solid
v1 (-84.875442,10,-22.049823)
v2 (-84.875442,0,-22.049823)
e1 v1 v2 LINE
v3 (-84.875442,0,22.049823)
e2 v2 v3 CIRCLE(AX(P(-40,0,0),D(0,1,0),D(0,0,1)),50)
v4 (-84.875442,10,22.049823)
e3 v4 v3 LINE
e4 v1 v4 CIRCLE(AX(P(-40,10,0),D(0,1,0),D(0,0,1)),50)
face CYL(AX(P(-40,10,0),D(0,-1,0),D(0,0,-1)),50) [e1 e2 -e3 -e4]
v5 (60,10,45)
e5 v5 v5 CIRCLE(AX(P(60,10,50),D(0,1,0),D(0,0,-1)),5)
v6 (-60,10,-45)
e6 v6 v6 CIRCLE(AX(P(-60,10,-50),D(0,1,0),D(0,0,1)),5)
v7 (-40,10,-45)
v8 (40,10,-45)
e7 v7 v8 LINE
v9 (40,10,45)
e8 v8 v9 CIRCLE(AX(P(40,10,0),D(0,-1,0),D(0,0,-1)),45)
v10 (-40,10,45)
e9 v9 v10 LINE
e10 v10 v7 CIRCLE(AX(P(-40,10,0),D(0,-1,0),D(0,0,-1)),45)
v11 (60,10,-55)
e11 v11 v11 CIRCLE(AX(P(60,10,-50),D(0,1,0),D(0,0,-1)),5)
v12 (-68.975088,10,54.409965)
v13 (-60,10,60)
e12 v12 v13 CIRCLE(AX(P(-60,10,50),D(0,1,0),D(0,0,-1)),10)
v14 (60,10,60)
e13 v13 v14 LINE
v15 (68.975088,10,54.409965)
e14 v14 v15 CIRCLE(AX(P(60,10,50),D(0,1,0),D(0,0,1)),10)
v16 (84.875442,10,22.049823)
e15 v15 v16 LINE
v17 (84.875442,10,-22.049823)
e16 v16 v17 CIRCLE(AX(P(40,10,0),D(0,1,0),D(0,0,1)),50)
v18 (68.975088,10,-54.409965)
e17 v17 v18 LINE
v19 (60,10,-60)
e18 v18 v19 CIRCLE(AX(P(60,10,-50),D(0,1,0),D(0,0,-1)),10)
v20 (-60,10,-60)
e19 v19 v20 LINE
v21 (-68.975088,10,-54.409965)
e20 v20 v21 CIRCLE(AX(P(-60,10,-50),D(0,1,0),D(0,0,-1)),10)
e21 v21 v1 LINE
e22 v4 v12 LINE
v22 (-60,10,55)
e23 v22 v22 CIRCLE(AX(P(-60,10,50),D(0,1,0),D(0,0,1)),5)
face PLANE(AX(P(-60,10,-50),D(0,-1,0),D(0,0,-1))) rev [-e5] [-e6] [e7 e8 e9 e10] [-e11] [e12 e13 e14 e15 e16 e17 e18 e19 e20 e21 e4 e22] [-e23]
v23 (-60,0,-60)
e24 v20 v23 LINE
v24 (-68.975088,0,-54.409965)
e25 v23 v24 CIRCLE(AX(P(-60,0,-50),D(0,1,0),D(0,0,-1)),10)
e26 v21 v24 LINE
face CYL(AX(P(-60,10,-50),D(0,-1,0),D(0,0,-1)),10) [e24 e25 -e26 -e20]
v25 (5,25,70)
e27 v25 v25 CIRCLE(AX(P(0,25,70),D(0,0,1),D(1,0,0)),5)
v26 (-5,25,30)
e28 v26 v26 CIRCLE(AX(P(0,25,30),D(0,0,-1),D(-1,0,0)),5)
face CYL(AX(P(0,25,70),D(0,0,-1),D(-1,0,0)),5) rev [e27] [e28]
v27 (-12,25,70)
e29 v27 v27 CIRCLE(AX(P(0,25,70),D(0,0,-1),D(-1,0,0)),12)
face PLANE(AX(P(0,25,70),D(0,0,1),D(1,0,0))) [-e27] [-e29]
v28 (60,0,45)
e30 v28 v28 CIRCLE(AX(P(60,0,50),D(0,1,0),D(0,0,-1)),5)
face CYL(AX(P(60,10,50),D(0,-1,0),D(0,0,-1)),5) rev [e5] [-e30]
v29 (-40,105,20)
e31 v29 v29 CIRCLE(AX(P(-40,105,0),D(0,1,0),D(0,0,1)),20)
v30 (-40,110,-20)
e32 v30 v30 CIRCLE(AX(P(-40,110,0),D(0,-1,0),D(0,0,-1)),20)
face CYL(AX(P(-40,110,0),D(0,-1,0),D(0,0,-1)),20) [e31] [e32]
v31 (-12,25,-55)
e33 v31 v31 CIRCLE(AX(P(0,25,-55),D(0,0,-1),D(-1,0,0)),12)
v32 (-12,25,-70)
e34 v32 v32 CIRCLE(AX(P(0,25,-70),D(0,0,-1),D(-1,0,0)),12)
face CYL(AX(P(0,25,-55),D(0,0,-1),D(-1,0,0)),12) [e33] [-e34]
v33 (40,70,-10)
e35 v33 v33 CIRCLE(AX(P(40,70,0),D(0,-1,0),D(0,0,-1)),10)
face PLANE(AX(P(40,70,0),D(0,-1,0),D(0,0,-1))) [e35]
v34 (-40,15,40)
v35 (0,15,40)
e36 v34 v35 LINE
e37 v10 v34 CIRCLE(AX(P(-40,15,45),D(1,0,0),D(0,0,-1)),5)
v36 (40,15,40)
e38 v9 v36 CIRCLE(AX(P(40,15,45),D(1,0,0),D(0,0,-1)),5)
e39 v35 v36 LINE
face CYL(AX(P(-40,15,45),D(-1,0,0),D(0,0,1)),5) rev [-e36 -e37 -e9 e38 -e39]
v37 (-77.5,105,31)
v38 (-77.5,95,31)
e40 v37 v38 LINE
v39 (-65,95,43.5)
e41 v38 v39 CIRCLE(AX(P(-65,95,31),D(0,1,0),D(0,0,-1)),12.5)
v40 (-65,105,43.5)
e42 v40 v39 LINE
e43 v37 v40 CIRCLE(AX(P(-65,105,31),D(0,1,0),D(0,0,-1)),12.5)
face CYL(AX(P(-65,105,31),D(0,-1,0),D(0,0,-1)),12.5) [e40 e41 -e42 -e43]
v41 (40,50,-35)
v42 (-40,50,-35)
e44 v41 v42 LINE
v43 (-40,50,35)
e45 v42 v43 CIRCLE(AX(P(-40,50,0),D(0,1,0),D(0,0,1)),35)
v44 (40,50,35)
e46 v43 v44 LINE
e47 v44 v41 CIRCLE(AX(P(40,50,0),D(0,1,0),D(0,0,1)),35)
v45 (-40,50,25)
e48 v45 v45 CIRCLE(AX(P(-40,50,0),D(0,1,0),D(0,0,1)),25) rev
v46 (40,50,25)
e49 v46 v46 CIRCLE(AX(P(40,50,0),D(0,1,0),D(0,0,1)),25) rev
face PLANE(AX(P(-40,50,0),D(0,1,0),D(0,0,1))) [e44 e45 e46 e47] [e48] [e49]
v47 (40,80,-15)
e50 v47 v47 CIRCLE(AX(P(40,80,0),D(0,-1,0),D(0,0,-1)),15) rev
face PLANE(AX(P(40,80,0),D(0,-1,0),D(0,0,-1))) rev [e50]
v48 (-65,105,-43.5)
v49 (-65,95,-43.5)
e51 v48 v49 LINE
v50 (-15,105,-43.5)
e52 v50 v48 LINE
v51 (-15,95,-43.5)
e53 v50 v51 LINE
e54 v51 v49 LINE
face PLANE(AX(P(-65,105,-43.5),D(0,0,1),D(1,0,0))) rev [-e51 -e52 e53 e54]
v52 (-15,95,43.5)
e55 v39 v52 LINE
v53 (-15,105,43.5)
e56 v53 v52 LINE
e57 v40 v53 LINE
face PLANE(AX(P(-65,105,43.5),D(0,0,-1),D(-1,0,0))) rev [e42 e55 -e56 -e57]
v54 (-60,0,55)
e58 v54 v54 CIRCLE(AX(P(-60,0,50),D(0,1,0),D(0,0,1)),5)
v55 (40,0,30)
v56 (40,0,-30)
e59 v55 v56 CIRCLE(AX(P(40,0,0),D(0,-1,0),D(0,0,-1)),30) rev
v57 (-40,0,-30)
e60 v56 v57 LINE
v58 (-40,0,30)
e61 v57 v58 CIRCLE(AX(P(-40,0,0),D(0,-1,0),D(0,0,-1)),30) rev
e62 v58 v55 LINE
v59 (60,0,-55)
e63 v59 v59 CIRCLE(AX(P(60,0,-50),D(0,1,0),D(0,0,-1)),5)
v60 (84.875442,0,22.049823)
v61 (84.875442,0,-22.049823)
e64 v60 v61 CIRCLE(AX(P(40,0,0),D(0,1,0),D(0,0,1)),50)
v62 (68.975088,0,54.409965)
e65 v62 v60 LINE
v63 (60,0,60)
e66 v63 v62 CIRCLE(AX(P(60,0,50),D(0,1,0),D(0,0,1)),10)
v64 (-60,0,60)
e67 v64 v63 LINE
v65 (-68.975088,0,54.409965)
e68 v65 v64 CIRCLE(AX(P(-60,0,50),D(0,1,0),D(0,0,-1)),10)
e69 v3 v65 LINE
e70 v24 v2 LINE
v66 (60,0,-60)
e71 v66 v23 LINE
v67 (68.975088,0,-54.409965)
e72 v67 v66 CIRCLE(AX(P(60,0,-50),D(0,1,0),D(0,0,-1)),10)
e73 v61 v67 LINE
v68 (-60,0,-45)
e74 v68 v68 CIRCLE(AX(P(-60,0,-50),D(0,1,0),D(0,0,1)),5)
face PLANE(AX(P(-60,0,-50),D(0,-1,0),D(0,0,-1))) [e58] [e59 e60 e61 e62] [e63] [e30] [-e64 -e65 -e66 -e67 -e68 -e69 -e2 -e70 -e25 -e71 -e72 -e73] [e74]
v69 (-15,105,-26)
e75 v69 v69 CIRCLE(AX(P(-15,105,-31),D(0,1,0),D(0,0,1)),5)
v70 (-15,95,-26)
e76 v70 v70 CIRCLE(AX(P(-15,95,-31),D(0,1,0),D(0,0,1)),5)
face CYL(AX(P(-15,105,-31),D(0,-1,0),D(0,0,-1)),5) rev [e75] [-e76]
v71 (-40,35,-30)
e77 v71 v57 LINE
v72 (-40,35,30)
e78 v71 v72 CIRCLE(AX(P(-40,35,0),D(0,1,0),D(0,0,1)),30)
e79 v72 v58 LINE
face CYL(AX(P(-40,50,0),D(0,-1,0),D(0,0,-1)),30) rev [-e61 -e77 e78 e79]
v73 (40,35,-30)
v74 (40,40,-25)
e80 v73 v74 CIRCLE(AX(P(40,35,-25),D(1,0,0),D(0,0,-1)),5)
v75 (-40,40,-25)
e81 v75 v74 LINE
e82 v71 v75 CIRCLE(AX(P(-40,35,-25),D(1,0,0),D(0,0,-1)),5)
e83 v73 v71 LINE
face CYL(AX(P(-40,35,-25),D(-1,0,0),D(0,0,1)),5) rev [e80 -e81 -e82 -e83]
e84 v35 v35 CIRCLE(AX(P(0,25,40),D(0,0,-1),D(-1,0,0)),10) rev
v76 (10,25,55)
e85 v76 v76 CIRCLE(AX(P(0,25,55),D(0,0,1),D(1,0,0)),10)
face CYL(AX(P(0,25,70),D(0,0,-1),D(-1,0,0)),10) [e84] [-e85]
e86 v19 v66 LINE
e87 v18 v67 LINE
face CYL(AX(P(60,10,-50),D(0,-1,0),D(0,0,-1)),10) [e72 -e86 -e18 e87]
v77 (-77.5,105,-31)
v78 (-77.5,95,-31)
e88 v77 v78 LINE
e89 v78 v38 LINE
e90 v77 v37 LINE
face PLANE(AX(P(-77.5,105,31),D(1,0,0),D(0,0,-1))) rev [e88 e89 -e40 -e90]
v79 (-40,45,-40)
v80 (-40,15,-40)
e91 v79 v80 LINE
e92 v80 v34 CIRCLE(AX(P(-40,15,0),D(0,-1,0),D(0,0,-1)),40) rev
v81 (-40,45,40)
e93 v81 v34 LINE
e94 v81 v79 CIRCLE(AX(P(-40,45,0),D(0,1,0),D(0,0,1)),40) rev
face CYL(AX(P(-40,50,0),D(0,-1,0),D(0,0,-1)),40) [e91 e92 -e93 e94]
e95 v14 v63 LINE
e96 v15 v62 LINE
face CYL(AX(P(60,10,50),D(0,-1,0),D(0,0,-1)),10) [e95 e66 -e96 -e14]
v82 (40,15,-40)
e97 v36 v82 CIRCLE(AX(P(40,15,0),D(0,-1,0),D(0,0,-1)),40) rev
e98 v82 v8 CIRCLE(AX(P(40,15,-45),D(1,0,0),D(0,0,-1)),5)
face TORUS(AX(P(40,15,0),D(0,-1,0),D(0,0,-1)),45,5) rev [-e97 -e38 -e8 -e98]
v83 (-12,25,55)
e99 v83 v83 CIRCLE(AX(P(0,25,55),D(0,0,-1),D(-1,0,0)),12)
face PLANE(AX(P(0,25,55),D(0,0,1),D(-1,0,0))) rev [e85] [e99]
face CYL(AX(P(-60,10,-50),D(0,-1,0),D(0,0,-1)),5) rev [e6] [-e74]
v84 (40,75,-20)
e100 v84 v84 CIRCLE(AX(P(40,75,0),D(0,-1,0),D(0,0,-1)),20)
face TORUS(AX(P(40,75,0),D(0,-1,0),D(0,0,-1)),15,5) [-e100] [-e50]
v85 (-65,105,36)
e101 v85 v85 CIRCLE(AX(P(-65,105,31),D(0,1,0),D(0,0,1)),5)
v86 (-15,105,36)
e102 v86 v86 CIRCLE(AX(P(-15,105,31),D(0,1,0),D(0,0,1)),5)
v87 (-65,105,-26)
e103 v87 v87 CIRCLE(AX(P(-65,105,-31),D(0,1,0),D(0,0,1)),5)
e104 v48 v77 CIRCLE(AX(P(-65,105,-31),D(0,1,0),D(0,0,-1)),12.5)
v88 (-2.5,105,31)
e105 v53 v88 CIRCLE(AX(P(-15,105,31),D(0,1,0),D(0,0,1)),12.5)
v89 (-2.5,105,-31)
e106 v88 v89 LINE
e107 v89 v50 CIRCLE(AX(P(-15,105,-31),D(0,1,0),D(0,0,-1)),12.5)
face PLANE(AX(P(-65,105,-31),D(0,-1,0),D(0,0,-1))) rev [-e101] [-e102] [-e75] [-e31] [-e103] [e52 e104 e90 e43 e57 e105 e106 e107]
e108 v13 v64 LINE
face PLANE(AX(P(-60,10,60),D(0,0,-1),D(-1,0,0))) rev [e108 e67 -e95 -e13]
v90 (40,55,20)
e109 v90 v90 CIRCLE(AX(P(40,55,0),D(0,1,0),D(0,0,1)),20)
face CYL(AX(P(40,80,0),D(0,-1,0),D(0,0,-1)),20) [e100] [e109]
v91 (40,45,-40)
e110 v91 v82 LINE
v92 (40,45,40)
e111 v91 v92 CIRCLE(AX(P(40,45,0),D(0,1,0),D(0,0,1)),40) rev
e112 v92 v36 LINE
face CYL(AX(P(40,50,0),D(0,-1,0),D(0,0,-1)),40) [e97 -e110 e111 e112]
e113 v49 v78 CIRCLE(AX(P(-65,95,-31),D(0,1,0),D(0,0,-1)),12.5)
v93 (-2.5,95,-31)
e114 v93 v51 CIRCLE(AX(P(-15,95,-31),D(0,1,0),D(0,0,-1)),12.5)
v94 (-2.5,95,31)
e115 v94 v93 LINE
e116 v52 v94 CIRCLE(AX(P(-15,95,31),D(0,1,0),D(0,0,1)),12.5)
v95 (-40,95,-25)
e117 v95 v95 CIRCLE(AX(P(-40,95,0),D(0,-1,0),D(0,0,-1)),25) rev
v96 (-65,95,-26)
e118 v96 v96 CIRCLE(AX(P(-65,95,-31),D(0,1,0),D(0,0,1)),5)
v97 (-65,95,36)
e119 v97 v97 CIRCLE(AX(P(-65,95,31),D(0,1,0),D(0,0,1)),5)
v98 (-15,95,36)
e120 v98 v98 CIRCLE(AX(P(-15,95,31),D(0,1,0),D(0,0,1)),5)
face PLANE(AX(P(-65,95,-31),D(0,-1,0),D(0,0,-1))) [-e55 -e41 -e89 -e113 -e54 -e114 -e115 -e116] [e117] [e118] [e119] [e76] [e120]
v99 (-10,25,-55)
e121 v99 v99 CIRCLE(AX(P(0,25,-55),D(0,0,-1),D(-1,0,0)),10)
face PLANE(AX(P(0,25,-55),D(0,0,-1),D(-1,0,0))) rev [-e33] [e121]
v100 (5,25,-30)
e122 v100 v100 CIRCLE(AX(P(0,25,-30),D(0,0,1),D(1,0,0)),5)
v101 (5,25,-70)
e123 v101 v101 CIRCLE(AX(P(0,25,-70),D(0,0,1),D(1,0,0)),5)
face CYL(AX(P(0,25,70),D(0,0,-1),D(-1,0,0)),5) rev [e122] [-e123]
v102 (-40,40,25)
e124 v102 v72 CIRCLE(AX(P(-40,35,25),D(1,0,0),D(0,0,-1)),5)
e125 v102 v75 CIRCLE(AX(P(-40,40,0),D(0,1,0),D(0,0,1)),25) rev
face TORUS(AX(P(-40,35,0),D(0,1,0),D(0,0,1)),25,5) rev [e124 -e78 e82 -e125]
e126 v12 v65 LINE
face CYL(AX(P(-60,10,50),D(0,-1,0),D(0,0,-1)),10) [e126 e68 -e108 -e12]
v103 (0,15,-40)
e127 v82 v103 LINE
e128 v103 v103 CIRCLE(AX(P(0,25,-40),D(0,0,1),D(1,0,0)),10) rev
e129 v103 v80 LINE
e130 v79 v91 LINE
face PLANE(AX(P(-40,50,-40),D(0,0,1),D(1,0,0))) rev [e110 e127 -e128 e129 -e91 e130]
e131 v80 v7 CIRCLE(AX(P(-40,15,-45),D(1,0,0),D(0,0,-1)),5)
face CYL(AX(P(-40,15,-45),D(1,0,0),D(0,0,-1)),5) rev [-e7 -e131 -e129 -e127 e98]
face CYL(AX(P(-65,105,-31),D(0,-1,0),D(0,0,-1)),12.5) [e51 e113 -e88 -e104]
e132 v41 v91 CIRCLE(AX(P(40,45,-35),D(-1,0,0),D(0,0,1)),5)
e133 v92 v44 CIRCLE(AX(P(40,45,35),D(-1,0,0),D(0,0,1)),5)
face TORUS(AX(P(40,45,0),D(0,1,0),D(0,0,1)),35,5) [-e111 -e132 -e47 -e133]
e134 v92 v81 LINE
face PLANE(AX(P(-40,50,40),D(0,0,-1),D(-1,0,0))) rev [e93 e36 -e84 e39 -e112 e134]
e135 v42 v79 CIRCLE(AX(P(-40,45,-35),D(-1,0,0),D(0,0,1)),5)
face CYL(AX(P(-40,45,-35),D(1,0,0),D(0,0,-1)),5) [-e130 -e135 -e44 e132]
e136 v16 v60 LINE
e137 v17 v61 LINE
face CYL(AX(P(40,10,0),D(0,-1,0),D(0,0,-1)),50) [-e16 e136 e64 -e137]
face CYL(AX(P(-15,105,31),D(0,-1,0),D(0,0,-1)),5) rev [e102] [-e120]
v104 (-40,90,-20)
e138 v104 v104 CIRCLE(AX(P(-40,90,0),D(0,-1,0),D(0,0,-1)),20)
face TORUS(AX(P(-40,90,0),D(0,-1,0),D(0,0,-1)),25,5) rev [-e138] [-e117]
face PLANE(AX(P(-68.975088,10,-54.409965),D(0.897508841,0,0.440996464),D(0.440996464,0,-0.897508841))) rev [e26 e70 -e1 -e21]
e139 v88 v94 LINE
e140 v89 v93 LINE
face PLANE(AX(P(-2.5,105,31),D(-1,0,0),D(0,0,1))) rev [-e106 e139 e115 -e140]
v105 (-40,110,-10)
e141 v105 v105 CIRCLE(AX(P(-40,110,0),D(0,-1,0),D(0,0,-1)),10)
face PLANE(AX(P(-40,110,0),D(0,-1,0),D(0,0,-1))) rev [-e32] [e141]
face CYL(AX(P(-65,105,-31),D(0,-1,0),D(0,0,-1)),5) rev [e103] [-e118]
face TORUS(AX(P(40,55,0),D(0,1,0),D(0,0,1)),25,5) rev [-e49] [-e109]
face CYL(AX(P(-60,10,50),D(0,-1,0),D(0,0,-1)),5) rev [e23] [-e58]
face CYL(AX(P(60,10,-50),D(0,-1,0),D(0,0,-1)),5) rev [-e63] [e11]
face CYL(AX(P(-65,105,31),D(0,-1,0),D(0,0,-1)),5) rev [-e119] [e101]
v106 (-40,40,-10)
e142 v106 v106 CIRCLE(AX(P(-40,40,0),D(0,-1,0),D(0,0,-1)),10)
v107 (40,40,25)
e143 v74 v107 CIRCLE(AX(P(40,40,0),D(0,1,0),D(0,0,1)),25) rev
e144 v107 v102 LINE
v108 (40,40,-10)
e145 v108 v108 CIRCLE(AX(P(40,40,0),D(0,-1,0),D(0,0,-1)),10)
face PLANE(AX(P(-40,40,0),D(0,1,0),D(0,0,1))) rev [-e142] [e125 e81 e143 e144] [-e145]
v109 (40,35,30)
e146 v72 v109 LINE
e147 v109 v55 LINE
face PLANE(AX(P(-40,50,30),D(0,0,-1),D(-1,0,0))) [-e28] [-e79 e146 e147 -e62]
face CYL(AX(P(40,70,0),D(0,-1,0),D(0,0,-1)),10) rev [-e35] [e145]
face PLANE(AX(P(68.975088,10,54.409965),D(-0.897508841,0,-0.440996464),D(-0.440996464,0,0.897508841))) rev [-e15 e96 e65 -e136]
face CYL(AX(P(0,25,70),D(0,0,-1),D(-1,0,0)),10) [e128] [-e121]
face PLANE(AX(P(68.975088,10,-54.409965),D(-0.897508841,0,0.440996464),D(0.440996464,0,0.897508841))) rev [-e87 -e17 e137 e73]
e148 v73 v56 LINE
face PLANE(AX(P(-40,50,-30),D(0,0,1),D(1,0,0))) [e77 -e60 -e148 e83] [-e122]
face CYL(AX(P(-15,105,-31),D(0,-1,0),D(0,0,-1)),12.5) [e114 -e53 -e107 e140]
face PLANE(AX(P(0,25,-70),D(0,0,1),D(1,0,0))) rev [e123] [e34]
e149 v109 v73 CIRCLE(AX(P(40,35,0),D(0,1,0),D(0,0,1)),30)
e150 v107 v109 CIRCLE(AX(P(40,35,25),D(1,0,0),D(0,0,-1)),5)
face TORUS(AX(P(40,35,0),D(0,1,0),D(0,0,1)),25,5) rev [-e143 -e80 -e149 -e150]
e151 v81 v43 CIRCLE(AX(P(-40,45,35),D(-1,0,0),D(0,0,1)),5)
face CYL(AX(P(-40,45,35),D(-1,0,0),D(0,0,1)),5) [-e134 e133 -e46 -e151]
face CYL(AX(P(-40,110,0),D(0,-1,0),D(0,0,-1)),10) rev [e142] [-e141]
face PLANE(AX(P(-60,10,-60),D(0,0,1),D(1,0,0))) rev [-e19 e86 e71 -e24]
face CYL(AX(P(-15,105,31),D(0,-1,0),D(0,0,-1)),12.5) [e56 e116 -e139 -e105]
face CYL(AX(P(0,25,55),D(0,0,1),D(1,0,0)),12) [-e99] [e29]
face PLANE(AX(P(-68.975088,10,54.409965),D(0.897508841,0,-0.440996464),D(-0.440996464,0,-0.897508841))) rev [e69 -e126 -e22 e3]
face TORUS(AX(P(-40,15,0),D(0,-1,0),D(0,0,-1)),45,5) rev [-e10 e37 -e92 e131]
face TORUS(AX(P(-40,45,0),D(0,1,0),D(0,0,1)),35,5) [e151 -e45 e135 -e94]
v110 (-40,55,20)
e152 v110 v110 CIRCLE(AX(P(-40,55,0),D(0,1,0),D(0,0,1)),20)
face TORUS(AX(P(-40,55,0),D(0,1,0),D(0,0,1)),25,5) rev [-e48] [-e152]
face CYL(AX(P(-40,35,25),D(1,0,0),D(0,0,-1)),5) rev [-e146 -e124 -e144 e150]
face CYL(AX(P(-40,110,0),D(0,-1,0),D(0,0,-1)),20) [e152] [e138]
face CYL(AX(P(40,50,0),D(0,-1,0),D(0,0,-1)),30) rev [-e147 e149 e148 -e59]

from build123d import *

# Parameters (mm, degrees)
SKETCH1_R           = 5
BOSS_EXTRUDE1_DEPTH = 10
BOSS_EXTRUDE2_DEPTH = 40
SHELL2_DEPTH        = 40
BOSS_EXTRUDE3_START = -10
SKETCH3_R           = 20
BOSS_EXTRUDE3_DEPTH = 30
SKETCH4_R           = 10
CUT_EXTRUDE1_DEPTH  = 30
SKETCH5_R           = 20
SKETCH5_R_2         = 10
BOSS_EXTRUDE4_DEPTH = 70
SKETCH5_3_R         = 10
CUT_EXTRUDE3_DEPTH  = 10
BOSS_EXTRUDE6_START = -15
SKETCH7_R           = 20
SKETCH7_R_2         = 5
BOSS_EXTRUDE6_DEPTH = 10
SKETCH10_R          = 10
SKETCH10_R_2        = 5
BOSS_EXTRUDE7_DEPTH = 70
CUT_EXTRUDE4_DEPTH  = 40
SKETCH12_R          = 5
CUT_EXTRUDE5_DEPTH  = 142.5
BOSS_EXTRUDE8_START = -15
SKETCH13_R          = 12
SKETCH13_R_2        = 10
BOSS_EXTRUDE8_DEPTH = 15
FILLET1_R           = 5


# Read off the part's stored shape, not the designer's step: Shell2
with BuildPart() as part:
    # Sketch1 → Boss-Extrude1 (new body)
    with BuildSketch(Plane(origin=(0, 0, 0), x_dir=(1, 0, 0), z_dir=(0, 1, 0))):
        with BuildLine():
            Line((-60, -60), (60, -60))
            ThreePointArc((60, -60), (65.286792677, -58.488216726), (68.975088406, -54.409964638))
            Line((68.975088406, -54.409964638), (84.87544203, -22.049823188))
            ThreePointArc((84.87544203, -22.049823188), (90, 0), (84.87544203, 22.049823188))
            Line((84.87544203, 22.049823188), (68.975088406, 54.409964638))
            ThreePointArc((68.975088406, 54.409964638), (65.286792677, 58.488216726), (60, 60))
            Line((60, 60), (-60, 60))
            ThreePointArc((-60, 60), (-65.286792677, 58.488216726), (-68.975088406, 54.409964638))
            Line((-68.975088406, 54.409964638), (-84.87544203, 22.049823188))
            ThreePointArc((-84.87544203, 22.049823188), (-90, 0), (-84.87544203, -22.049823188))
            Line((-84.87544203, -22.049823188), (-68.975088406, -54.409964638))
            ThreePointArc((-68.975088406, -54.409964638), (-65.286792677, -58.488216726), (-60, -60))
        make_face()
        with Locations(Location((-60, 50, 0), (0, 0, 270))):
            Circle(SKETCH1_R, mode=Mode.SUBTRACT)
        with Locations(Location((-60, -50, 0), (0, 0, 270))):
            Circle(SKETCH1_R, mode=Mode.SUBTRACT)
        with Locations(Location((60, -50, 0), (0, 0, 90))):
            Circle(SKETCH1_R, mode=Mode.SUBTRACT)
        with Locations(Location((60, 50, 0), (0, 0, 90))):
            Circle(SKETCH1_R, mode=Mode.SUBTRACT)
    extrude(amount=BOSS_EXTRUDE1_DEPTH)

    # Sketch2 → Boss-Extrude2 (add)
    with BuildSketch(Plane(origin=(0, 10, 0), x_dir=(1, 0, 0), z_dir=(0, 1, 0))):
        with BuildLine():
            Line((-40, 40), (40, 40))
            ThreePointArc((40, 40), (80, 0), (40, -40))
            Line((40, -40), (-40, -40))
            ThreePointArc((-40, -40), (-80, 0), (-40, 40))
        make_face()
    extrude(amount=BOSS_EXTRUDE2_DEPTH)

    # Shell2 outline → Shell2 (cut)
    with BuildSketch(Plane(origin=(0, 0, 0), x_dir=(1, 0, 0), z_dir=(0, 1, 0))):
        with BuildLine():
            ThreePointArc((-40, 30), (-70, 0), (-40, -30))
            Line((-40, -30), (40, -30))
            ThreePointArc((40, -30), (70, 0), (40, 30))
            Line((40, 30), (-40, 30))
        make_face()
    extrude(amount=SHELL2_DEPTH, mode=Mode.SUBTRACT)

    # Sketch3 → Boss-Extrude3 (add)
    with BuildSketch(Plane.XZ.offset(-40).offset(BOSS_EXTRUDE3_START)):
        with Locations(Location((40, 0, 0), (0, 0, 270))):
            Circle(SKETCH3_R)
    extrude(amount=-BOSS_EXTRUDE3_DEPTH)

    # Sketch4 → Cut-Extrude1 (cut)
    with BuildSketch(Plane.XZ.offset(-40)):
        with Locations(Location((40, 0, 0), (0, 0, 270))):
            Circle(SKETCH4_R)
    extrude(amount=-CUT_EXTRUDE1_DEPTH, mode=Mode.SUBTRACT)

    # Sketch5 → Boss-Extrude4 (add)
    with BuildSketch(Plane.XZ.offset(-40)):
        with Locations(Location((-40, 0, 0), (0, 0, 270))):
            Circle(SKETCH5_R)
        with Locations(Location((-40, 0, 0), (0, 0, 270))):
            Circle(SKETCH5_R_2, mode=Mode.SUBTRACT)
    extrude(amount=-BOSS_EXTRUDE4_DEPTH)

    # Sketch5<3> → Cut-Extrude3 (cut)
    with BuildSketch(Plane.XZ.offset(-40)):
        with Locations(Location((-40, 0, 0), (0, 0, 270))):
            Circle(SKETCH5_3_R)
    extrude(amount=-CUT_EXTRUDE3_DEPTH, mode=Mode.SUBTRACT)

    # Sketch7 → Boss-Extrude6 (add)
    with BuildSketch(Plane(origin=(0, 110, 0), x_dir=(1, 0, 0), z_dir=(0, 1, 0)).offset(BOSS_EXTRUDE6_START)):
        with BuildLine():
            Line((-65, -43.5), (-15, -43.5))
            ThreePointArc((-15, -43.5), (-6.161165235, -39.838834765), (-2.5, -31))
            Line((-2.5, -31), (-2.5, 31))
            ThreePointArc((-2.5, 31), (-6.161165235, 39.838834765), (-15, 43.5))
            Line((-15, 43.5), (-65, 43.5))
            ThreePointArc((-65, 43.5), (-73.838834765, 39.838834765), (-77.5, 31))
            Line((-77.5, 31), (-77.5, -31))
            ThreePointArc((-77.5, -31), (-73.838834765, -39.838834765), (-65, -43.5))
        make_face()
        with Locations(Location((-40, 0, 0), (0, 0, 90))):
            Circle(SKETCH7_R, mode=Mode.SUBTRACT)
        with Locations(Location((-15, 31, 0), (0, 0, 270))):
            Circle(SKETCH7_R_2, mode=Mode.SUBTRACT)
        with Locations(Location((-65, 31, 0), (0, 0, 270))):
            Circle(SKETCH7_R_2, mode=Mode.SUBTRACT)
        with Locations(Location((-15, -31, 0), (0, 0, 270))):
            Circle(SKETCH7_R_2, mode=Mode.SUBTRACT)
        with Locations(Location((-65, -31, 0), (0, 0, 270))):
            Circle(SKETCH7_R_2, mode=Mode.SUBTRACT)
    extrude(amount=BOSS_EXTRUDE6_DEPTH)

    # Sketch10 → Boss-Extrude7 (add, symmetric)
    with BuildSketch(Plane.XY):
        with Locations(Location((0, 25, 0), (0, 0, 180))):
            Circle(SKETCH10_R)
        with Locations((0, 25)):
            Circle(SKETCH10_R_2, mode=Mode.SUBTRACT)
    extrude(amount=BOSS_EXTRUDE7_DEPTH, both=True)

    # Sketch11 → Cut-Extrude4 (cut)
    with BuildSketch(Plane.XZ):
        with BuildLine():
            Line((-40, 30), (40, 30))
            ThreePointArc((40, 30), (70, 0), (40, -30))
            Line((40, -30), (-40, -30))
            ThreePointArc((-40, -30), (-70, 0), (-40, 30))
        make_face()
    extrude(amount=-CUT_EXTRUDE4_DEPTH, mode=Mode.SUBTRACT)

    # Sketch12 → Cut-Extrude5 (cut, symmetric)
    with BuildSketch(Plane(origin=(0, 0, -40), x_dir=(-1, 0, 0), z_dir=(0, 0, -1))):
        with Locations(Location((0, 25, 0), (0, 0, 180))):
            Circle(SKETCH12_R)
    extrude(amount=CUT_EXTRUDE5_DEPTH, both=True, mode=Mode.SUBTRACT)

    # Sketch13 → Boss-Extrude8 (add)
    with BuildSketch(Plane(origin=(0, 0, -70), x_dir=(-1, 0, 0), z_dir=(0, 0, -1)).offset(BOSS_EXTRUDE8_START)):
        with Locations((0, 25)):
            Circle(SKETCH13_R)
        with Locations((0, 25)):
            Circle(SKETCH13_R_2, mode=Mode.SUBTRACT)
    boss_extrude8 = extrude(amount=BOSS_EXTRUDE8_DEPTH)

    # Mirror1: Boss-Extrude8 across plane
    add(boss_extrude8.mirror(Plane.XY))

    # Fillet1
    fillet1_edges = [part.edges().sort_by_distance(p)[0] for p in [
        (-40, 95, 20),
        (-80, 10, 0),
        (0, 10, 40),
        (80, 10, 0),
        (0, 10, -40),
        (-80, 50, 0),
        (0, 50, 40),
        (80, 50, 0),
        (0, 50, -40),
        (-70, 40, 0),
        (0, 40, 30),
        (70, 40, 0),
        (0, 40, -30),
        (40, 50, 20),
        (40, 80, 20),
        (-40, 50, 20),
    ]]
    fillet(fillet1_edges, radius=FILLET1_R - 0.0001)  # a hair under: the kernel refuses the full size


solid = part.part
